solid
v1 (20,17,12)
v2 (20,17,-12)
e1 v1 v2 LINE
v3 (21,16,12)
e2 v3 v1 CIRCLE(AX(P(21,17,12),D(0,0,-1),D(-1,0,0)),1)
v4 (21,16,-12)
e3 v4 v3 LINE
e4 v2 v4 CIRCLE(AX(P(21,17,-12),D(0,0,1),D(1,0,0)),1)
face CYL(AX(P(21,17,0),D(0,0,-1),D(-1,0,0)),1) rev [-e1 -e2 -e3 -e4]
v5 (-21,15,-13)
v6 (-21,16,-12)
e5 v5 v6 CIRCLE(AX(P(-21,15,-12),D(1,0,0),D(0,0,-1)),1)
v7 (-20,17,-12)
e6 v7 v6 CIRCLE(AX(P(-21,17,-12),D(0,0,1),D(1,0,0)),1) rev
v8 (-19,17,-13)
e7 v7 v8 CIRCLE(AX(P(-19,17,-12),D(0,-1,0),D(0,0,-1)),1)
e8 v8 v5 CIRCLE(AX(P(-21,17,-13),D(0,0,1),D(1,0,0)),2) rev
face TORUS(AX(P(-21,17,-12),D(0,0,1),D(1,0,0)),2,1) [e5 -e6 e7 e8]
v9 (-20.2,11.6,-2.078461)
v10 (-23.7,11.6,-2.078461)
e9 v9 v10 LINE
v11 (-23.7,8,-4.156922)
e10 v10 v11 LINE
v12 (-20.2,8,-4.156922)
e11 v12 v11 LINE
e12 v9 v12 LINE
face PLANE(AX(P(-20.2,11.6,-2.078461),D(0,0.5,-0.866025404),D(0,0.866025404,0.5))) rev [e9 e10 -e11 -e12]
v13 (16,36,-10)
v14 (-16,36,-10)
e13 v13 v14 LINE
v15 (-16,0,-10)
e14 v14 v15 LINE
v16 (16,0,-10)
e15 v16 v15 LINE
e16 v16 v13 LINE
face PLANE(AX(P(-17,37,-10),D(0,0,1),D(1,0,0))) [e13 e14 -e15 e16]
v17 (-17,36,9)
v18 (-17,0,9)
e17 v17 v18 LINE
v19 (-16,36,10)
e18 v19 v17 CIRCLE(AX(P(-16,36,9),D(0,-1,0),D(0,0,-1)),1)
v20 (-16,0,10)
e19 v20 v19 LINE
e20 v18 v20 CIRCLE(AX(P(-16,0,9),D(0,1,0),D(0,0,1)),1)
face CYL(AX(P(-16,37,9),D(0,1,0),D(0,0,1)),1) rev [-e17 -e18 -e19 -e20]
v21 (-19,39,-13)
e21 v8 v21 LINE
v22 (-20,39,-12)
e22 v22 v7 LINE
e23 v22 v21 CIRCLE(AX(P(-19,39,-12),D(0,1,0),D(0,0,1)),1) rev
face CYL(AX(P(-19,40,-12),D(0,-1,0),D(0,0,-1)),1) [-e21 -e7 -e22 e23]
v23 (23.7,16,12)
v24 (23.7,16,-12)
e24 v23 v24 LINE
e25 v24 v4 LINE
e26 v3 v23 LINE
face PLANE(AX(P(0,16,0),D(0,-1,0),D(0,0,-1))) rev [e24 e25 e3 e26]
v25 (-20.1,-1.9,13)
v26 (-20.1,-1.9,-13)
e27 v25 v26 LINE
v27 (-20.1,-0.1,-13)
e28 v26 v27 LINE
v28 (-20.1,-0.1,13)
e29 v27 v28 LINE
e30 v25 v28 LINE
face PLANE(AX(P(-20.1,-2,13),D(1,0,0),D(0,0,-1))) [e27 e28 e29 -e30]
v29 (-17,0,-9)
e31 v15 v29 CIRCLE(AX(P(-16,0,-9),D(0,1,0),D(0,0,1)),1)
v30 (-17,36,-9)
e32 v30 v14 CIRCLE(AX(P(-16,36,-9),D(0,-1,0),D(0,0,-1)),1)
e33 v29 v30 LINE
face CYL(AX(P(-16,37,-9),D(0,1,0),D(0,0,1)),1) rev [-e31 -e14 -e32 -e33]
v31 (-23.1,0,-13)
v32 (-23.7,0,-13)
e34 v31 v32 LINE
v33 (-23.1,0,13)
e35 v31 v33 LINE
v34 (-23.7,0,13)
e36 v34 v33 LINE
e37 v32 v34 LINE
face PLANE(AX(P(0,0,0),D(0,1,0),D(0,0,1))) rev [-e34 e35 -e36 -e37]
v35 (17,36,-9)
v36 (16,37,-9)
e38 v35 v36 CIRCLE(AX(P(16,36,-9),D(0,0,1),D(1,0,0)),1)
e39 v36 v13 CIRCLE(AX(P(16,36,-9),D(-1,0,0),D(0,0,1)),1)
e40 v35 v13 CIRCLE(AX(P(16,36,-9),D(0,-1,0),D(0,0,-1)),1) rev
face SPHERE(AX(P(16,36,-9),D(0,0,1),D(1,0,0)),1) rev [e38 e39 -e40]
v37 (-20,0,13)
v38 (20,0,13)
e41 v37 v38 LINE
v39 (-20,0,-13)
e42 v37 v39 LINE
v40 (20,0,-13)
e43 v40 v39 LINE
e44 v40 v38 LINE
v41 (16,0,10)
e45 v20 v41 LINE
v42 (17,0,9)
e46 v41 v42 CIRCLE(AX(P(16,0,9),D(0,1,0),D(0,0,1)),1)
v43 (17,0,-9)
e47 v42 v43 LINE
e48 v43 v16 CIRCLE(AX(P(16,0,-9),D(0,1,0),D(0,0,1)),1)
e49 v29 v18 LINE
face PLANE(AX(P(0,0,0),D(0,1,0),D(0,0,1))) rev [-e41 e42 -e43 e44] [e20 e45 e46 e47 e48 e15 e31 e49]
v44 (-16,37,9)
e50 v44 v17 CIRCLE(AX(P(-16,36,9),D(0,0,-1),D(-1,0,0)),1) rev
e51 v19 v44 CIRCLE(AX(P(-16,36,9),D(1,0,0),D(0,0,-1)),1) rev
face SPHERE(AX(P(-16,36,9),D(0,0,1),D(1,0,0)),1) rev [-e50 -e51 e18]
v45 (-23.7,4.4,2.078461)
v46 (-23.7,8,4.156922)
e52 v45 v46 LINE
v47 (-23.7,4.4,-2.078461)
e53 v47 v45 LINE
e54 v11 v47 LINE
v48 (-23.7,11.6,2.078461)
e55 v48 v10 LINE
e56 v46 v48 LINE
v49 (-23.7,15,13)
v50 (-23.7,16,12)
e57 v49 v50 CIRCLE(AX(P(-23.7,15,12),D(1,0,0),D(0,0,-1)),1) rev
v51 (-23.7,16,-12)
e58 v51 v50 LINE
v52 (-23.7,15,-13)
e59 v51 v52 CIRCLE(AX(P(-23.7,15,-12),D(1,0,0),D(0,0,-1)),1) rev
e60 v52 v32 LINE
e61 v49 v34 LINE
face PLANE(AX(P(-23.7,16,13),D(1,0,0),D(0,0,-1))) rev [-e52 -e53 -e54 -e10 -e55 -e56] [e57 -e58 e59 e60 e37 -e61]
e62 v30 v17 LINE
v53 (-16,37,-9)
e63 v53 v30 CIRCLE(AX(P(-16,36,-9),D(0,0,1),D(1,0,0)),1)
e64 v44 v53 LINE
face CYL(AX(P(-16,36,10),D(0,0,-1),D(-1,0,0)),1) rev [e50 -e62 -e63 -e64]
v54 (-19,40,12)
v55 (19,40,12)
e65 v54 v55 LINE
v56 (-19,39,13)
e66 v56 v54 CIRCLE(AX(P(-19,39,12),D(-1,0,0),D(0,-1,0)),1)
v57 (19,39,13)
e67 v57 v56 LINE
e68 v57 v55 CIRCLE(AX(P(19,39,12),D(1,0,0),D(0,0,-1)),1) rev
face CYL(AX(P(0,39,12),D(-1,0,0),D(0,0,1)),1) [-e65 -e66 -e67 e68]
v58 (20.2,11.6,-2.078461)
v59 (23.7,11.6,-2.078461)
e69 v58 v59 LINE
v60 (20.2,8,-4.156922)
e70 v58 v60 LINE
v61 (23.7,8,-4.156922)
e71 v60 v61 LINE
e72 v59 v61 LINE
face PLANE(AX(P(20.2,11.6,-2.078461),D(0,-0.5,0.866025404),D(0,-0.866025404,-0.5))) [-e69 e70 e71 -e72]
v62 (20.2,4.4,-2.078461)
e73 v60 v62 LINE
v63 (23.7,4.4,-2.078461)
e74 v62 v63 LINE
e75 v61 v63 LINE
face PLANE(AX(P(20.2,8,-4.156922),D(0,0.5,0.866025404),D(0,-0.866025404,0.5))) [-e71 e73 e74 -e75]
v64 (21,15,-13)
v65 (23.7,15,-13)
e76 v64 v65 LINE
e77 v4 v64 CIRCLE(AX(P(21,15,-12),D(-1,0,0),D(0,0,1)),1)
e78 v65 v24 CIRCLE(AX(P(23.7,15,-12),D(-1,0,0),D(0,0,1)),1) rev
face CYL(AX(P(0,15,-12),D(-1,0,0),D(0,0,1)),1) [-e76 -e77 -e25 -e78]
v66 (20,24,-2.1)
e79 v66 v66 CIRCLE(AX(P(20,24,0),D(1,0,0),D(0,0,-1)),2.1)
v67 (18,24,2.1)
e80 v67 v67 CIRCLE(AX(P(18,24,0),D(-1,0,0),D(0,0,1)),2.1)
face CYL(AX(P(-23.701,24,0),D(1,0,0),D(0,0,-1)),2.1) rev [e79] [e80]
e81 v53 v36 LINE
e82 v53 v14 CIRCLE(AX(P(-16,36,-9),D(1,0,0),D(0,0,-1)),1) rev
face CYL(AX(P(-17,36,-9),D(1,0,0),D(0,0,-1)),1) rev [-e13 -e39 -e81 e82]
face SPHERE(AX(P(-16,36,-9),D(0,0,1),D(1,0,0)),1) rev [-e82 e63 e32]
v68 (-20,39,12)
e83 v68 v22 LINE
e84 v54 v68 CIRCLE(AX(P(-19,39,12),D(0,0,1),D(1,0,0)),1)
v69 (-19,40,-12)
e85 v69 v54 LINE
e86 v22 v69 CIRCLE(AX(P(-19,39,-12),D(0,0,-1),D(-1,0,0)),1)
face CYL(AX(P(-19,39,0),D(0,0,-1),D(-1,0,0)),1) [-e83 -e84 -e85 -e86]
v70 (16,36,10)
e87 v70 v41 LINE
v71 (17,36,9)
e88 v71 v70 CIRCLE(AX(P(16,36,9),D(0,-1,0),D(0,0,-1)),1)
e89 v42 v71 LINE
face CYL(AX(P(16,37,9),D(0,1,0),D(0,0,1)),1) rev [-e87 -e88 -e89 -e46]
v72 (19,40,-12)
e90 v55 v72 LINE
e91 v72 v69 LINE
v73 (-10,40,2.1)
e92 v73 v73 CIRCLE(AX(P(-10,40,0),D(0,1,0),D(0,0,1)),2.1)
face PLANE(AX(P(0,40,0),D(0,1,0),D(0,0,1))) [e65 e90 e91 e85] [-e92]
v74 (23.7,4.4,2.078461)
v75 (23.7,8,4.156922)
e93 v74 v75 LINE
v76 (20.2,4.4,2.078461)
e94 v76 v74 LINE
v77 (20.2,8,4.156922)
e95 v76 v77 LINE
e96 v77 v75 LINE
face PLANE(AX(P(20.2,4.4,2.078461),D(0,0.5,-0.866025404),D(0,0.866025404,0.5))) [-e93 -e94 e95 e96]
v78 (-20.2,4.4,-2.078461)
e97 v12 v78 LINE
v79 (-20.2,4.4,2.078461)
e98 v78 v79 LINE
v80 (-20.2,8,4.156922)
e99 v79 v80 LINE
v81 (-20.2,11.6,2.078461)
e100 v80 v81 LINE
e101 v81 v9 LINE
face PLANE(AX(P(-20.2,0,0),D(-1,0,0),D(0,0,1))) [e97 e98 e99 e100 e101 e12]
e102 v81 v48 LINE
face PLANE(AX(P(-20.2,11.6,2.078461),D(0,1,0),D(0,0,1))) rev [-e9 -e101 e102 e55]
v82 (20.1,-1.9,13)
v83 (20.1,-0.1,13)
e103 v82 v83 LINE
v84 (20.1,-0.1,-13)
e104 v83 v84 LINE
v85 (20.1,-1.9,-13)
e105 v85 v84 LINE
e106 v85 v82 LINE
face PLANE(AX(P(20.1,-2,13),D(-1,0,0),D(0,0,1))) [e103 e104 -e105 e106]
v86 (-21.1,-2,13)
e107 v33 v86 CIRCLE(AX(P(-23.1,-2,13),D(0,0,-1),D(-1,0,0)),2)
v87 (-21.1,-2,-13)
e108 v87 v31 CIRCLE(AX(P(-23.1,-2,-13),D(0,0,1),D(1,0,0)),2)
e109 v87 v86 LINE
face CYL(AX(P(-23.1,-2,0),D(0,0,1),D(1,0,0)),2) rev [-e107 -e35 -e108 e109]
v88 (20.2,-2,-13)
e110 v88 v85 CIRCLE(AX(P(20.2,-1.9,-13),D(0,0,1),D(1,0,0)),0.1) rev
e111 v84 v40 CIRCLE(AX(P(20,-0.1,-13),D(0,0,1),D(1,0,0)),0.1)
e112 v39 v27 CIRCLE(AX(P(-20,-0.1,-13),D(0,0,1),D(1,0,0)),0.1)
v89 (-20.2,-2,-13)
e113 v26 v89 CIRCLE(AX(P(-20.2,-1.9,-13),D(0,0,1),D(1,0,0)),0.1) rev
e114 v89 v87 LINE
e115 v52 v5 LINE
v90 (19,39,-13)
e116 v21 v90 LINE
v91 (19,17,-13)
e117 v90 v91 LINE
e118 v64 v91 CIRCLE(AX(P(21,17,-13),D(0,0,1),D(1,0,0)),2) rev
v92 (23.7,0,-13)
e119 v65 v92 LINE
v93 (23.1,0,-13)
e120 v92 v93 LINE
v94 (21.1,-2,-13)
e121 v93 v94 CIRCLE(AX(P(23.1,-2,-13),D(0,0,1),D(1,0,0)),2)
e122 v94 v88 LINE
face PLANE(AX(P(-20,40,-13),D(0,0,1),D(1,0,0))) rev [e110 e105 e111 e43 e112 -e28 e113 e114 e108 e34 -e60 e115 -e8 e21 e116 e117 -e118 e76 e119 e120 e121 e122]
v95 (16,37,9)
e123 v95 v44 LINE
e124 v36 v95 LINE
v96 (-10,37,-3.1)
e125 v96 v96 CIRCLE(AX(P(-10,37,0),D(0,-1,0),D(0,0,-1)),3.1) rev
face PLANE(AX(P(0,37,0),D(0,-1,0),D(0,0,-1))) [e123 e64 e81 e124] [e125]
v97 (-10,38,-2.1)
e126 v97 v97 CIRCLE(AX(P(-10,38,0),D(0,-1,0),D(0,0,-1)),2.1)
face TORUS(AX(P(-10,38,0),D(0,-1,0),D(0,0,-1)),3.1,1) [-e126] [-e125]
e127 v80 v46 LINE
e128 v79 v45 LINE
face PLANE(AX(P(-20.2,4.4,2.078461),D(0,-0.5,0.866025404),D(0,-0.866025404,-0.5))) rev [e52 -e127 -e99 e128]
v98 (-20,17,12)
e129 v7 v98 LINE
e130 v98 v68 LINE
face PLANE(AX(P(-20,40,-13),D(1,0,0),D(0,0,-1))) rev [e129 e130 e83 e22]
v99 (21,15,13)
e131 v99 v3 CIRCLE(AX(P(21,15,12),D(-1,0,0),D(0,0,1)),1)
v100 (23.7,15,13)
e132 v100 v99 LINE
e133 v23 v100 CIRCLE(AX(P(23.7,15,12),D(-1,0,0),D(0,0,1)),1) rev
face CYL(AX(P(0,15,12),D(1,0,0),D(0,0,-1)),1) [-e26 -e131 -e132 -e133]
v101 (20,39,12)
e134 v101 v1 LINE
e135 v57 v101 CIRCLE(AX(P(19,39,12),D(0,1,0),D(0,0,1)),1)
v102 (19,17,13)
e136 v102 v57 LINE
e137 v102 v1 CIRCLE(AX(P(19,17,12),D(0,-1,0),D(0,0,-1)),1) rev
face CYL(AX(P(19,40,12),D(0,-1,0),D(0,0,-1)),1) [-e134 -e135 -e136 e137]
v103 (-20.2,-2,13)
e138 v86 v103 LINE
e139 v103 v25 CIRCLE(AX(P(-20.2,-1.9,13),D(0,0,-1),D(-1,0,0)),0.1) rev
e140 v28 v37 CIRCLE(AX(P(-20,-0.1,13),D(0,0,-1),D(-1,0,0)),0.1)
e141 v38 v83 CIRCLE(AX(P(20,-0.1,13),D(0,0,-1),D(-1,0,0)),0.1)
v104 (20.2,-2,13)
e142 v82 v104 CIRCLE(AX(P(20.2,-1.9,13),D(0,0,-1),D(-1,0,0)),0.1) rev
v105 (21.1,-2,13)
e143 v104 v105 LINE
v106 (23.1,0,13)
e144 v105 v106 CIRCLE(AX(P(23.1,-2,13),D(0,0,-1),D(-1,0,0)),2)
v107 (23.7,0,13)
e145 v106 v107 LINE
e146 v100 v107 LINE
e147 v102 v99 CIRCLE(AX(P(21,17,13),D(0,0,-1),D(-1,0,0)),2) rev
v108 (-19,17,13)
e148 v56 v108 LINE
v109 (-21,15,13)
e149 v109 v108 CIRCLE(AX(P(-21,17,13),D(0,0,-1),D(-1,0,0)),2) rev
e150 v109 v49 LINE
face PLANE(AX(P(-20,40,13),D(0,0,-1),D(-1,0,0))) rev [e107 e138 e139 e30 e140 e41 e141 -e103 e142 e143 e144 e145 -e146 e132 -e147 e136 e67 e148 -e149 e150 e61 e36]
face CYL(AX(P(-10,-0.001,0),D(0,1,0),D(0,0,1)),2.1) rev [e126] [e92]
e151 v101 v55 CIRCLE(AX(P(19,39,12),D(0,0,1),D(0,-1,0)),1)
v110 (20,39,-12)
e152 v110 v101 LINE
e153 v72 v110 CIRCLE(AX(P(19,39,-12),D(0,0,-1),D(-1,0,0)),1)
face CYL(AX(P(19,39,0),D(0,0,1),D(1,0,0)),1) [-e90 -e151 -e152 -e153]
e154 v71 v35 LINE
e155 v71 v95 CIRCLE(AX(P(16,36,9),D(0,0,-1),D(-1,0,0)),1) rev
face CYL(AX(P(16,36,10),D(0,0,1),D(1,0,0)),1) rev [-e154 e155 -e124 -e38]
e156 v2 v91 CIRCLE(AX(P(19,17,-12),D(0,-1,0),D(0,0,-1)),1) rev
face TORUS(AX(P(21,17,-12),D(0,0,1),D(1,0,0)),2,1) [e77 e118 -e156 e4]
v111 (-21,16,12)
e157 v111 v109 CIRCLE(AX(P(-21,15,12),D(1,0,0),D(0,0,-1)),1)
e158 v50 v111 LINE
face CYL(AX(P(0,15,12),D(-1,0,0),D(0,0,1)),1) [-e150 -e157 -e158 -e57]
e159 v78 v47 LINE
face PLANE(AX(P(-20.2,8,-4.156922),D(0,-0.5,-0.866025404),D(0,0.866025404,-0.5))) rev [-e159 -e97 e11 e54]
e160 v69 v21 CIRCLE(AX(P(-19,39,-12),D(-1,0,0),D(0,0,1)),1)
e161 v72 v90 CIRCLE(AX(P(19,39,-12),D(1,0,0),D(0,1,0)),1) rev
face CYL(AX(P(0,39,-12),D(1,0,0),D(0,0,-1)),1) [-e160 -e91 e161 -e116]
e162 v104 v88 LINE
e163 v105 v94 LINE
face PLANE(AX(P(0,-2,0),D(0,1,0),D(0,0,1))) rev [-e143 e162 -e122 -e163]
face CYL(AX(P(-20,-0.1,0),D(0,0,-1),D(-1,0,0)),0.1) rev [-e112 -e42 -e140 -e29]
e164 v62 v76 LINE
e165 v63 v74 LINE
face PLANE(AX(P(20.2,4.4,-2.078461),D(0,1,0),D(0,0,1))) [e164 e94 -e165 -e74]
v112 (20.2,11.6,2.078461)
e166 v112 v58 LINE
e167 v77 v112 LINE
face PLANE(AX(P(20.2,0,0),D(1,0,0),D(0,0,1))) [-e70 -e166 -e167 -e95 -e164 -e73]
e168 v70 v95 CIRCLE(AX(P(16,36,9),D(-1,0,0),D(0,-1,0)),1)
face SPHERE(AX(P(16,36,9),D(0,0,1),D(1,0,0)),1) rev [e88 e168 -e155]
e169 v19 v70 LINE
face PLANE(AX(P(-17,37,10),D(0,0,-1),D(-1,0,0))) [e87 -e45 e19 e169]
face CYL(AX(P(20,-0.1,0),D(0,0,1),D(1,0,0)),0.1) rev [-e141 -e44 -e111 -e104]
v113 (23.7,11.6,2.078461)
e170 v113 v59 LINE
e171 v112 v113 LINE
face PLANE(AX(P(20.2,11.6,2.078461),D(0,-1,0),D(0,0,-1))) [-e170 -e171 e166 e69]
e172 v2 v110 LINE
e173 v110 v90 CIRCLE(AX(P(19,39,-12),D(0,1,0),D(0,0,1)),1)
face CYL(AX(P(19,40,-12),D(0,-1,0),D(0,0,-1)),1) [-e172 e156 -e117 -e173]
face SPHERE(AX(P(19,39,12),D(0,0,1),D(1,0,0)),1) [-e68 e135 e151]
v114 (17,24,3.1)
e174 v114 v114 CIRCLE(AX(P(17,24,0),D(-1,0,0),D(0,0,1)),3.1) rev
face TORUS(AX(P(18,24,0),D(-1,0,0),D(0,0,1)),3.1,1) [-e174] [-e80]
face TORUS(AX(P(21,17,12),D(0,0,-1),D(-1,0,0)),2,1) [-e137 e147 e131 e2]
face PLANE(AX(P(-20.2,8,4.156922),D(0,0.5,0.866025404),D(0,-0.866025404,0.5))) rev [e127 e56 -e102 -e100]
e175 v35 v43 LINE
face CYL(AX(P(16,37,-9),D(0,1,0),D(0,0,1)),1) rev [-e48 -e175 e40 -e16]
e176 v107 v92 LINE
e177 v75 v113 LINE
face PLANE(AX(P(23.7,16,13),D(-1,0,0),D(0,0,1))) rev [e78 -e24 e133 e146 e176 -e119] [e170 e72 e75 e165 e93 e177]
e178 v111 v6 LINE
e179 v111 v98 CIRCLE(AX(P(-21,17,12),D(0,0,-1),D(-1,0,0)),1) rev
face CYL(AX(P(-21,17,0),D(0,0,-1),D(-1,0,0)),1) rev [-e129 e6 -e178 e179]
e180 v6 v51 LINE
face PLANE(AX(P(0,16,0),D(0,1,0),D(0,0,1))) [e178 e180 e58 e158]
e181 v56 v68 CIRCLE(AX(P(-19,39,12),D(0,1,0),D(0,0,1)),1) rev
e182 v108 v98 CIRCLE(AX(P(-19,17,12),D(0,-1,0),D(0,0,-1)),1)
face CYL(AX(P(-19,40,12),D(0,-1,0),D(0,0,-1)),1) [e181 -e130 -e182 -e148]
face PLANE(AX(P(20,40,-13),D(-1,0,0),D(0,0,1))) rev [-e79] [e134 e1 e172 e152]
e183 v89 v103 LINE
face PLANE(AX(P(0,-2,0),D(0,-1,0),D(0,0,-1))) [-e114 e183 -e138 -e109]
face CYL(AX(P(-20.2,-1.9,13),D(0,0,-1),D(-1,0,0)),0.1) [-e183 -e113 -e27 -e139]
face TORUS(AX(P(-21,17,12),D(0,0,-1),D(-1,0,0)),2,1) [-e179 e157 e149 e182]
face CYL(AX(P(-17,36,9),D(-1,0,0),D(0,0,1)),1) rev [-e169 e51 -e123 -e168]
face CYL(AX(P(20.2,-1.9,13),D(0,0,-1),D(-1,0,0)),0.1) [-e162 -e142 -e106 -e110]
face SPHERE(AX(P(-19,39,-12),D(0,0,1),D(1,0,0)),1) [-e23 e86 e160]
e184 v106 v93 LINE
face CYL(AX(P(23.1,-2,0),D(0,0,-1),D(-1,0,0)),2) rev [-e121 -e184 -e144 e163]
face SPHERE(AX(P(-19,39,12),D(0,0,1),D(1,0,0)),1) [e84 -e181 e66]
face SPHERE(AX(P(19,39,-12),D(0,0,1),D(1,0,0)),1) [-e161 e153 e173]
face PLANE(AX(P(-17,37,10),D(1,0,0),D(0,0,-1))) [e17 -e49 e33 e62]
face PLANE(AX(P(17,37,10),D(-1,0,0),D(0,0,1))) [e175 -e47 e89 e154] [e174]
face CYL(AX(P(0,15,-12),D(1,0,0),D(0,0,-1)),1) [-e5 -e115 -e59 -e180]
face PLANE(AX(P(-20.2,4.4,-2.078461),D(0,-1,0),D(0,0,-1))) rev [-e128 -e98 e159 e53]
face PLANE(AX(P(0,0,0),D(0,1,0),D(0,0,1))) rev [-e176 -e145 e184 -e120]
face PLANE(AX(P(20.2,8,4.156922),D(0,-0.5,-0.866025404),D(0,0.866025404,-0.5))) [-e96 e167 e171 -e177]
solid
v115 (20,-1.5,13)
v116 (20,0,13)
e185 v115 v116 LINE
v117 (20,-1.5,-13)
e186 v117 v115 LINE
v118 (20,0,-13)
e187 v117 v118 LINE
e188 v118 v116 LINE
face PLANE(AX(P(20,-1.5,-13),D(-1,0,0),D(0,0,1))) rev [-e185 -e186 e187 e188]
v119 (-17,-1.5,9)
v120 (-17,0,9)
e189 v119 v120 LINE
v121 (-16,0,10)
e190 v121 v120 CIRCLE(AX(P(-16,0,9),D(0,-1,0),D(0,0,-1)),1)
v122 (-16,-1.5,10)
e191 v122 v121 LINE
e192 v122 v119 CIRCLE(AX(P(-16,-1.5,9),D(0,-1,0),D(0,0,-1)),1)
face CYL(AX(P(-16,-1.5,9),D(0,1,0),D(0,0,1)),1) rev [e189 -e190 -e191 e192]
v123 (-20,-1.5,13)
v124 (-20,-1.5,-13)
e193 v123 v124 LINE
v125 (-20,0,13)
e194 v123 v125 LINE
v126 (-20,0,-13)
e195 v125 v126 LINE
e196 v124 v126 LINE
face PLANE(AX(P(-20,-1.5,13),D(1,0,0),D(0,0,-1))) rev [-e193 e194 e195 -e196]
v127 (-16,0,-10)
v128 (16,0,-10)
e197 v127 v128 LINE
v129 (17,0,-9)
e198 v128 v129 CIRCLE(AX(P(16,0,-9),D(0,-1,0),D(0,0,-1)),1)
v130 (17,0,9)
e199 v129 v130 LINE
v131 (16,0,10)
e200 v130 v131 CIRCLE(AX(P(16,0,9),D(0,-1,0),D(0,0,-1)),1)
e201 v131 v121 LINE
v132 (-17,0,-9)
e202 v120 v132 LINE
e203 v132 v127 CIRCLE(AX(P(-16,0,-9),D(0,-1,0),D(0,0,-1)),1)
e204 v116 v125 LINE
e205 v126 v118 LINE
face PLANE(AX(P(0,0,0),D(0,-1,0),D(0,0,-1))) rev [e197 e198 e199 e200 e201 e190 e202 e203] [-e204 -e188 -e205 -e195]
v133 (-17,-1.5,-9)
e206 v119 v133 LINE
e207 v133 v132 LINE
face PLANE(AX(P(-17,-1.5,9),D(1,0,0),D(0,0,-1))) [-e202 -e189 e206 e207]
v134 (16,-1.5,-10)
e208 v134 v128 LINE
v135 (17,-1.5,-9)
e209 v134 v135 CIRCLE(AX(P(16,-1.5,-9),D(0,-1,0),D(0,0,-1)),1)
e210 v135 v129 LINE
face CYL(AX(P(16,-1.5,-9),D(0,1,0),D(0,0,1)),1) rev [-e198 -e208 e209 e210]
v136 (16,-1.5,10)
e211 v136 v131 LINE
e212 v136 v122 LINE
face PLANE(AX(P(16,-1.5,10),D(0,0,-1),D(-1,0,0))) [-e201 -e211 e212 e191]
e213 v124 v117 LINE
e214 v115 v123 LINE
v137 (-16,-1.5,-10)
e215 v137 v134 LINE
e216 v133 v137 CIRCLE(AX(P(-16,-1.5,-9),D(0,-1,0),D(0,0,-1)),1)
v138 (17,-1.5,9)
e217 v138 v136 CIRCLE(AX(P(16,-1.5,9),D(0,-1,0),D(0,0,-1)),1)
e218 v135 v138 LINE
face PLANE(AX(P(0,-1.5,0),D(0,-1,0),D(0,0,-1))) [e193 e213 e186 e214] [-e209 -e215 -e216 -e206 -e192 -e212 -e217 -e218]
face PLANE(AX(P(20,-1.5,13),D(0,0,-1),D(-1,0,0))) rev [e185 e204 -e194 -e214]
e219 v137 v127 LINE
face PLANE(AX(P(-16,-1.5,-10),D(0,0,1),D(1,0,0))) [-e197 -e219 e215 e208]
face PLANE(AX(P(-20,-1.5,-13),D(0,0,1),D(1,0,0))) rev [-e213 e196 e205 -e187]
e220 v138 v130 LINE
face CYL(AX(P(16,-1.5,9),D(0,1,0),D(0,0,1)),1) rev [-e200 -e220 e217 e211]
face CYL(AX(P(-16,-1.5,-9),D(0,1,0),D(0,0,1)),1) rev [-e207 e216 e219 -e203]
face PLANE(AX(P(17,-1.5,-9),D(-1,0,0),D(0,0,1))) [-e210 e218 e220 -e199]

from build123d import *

# Parameters (mm, degrees)
SKETCH1_W               = 40
SKETCH1_H               = 26
BODY_DEPTH              = 40
SKETCH2_W               = 3.7
SKETCH2_H               = 26
EXTENSION_DEPTH         = 16
SKETCH5_W               = 34
SKETCH5_H               = 20
CAVITY_DEPTH            = 37
TOP_HOLE_REACH          = 50.277
SKETCH6_R               = 2.1
SIDE_HOLE_REACH         = 62.652
SKETCH7_R               = 2.1
SKETCH3_W               = 1
SKETCH3_H               = 26
LEGS_DEPTH              = 2
MOUNT_COUNTERBORE_DEPTH = 3.5
F_2MM_LEG_FILLET_R      = 2
F_0_1MM_LEG_FILLET_R    = 0.1
OUTER_BOUNDARY_FILLET_R = 1
INNER_BOUNDARY_FILLET_R = 1
SKETCH8_W               = 40
SKETCH8_H               = 26
BOSS_EXTRUDE1_DEPTH     = 1.5


with BuildPart() as part:
    # Sketch1 → Body (new body)
    with BuildSketch(Plane(origin=(0, 0, 0), x_dir=(1, 0, 0), z_dir=(0, 1, 0))):
        Rectangle(SKETCH1_W, SKETCH1_H)
    extrude(amount=BODY_DEPTH)

    # Sketch2 → Extension (add)
    with BuildSketch(Plane(origin=(0, 0, 0), x_dir=(1, 0, 0), z_dir=(0, 1, 0))):
        with Locations((-21.85, 0)):
            Rectangle(SKETCH2_W, SKETCH2_H)
        with Locations((21.85, 0)):
            Rectangle(SKETCH2_W, SKETCH2_H)
    extrude(amount=EXTENSION_DEPTH)

    # Sketch5 → Cavity (cut)
    with BuildSketch(Plane(origin=(0, 0, 0), x_dir=(1, 0, 0), z_dir=(0, 1, 0))):
        Rectangle(SKETCH5_W, SKETCH5_H)
    extrude(amount=CAVITY_DEPTH, mode=Mode.SUBTRACT)

    # Sketch6 → Top Hole (cut, up to next)
    with BuildSketch(Plane(origin=(0, 40, 0), x_dir=(1, 0, 0), z_dir=(0, 1, 0)), mode=Mode.PRIVATE) as top_hole_sk1:
        with Locations(Location((-10, 0, 0), (0, 0, 270))):
            Circle(SKETCH6_R)
    top_hole_tool1 = extrude(top_hole_sk1.sketch, amount=-TOP_HOLE_REACH, mode=Mode.PRIVATE) & part.part
    add(top_hole_tool1.solids().sort_by_distance((-10, 40, 0))[0], mode=Mode.SUBTRACT)

    # Sketch7 → Side Hole (cut, up to next)
    with BuildSketch(Plane(origin=(20, 0, 0), x_dir=(0, 0, -1), z_dir=(1, 0, 0)), mode=Mode.PRIVATE) as side_hole_sk1:
        with Locations((0, 24)):
            Circle(SKETCH7_R)
    side_hole_tool1 = extrude(side_hole_sk1.sketch, amount=-SIDE_HOLE_REACH, mode=Mode.PRIVATE) & part.part
    add(side_hole_tool1.solids().sort_by_distance((20, 24, 0))[0], mode=Mode.SUBTRACT)

    # Sketch3 → Legs (add)
    with BuildSketch(Plane(origin=(0, 0, 0), x_dir=(1, 0, 0), z_dir=(0, 1, 0))):
        with Locations((-20.6, 0)):
            Rectangle(SKETCH3_W, SKETCH3_H)
        with Locations((20.6, 0)):
            Rectangle(SKETCH3_W, SKETCH3_H)
    extrude(amount=-LEGS_DEPTH)

    # Sketch4 → Mount Counterbore (cut)
    with BuildSketch(Plane.ZY.offset(23.7)):
        Polygon((2.078460969, 11.6), (-2.078460969, 11.6), (-4.156921938, 8), (-2.078460969, 4.4), (2.078460969, 4.4), (4.156921938, 8), align=None)
    mount_counterbore = extrude(amount=-MOUNT_COUNTERBORE_DEPTH, mode=Mode.SUBTRACT)

    # Mount Counterbore Mirror: Mount Counterbore across plane
    add(mount_counterbore.mirror(Plane(origin=(0, 0, 0), x_dir=(0, 0, 1), z_dir=(1, 0, 0))), mode=Mode.SUBTRACT)

    # 2mm Leg Fillet
    f_2mm_leg_fillet_edges = [part.edges().sort_by_distance(p)[0] for p in [
        (21.1, 0, 0),
        (-21.1, 0, 0),
    ]]
    fillet(f_2mm_leg_fillet_edges, radius=F_2MM_LEG_FILLET_R - 0.0001)  # a hair under: the kernel refuses the full size

    # 0.1mm Leg Fillet
    f_0_1mm_leg_fillet_edges = [part.edges().sort_by_distance(p)[0] for p in [
        (-20.1, -2, 0),
        (-20.1, 0, 0),
        (20.1, -2, 0),
        (20.1, 0, 0),
    ]]
    fillet(f_0_1mm_leg_fillet_edges, radius=F_0_1MM_LEG_FILLET_R)

    # Outer Boundary Fillet
    outer_boundary_fillet_edges = [part.edges().sort_by_distance(p)[0] for p in [
        (20, 40, 0),
        (-20, 16, 0),
        (-21.85, 16, -13),
        (0, 40, -13),
        (-21.85, 16, 13),
        (20, 16, 0),
        (21.85, 16, 13),
        (21.85, 16, -13),
        (-20, 40, 0),
        (-20, 28, -13),
        (20, 28, -13),
        (20, 28, 13),
        (-20, 28, 13),
        (0, 40, 13),
    ]]
    fillet(outer_boundary_fillet_edges, radius=OUTER_BOUNDARY_FILLET_R)

    # Inner Boundary Fillet
    inner_boundary_fillet_edges = [part.edges().sort_by_distance(p)[0] for p in [
        (-17, 18.5, -10),
        (-17, 18.5, 10),
        (17, 18.5, 10),
        (17, 18.5, -10),
        (-17, 37, 0),
        (0, 37, 10),
        (17, 37, 0),
        (0, 37, -10),
        (-10, 37, -2.1),
        (17, 24, 2.1),
    ]]
    fillet(inner_boundary_fillet_edges, radius=INNER_BOUNDARY_FILLET_R)


with BuildPart() as body_2:
    # Sketch8 → Boss-Extrude1 (new body)
    with BuildSketch(Plane.XZ):
        Rectangle(SKETCH8_W, SKETCH8_H)
        with BuildLine():
            Line((-16, -10), (16, -10))
            ThreePointArc((16, -10), (16.707106781, -9.707106781), (17, -9))
            Line((17, -9), (17, 9))
            ThreePointArc((17, 9), (16.707106781, 9.707106781), (16, 10))
            Line((16, 10), (-16, 10))
            ThreePointArc((-16, 10), (-16.707106781, 9.707106781), (-17, 9))
            Line((-17, 9), (-17, -9))
            ThreePointArc((-17, -9), (-16.707106781, -9.707106781), (-16, -10))
        make_face(mode=Mode.SUBTRACT)
    extrude(amount=BOSS_EXTRUDE1_DEPTH)


solid = Compound([part.part, body_2.part])
